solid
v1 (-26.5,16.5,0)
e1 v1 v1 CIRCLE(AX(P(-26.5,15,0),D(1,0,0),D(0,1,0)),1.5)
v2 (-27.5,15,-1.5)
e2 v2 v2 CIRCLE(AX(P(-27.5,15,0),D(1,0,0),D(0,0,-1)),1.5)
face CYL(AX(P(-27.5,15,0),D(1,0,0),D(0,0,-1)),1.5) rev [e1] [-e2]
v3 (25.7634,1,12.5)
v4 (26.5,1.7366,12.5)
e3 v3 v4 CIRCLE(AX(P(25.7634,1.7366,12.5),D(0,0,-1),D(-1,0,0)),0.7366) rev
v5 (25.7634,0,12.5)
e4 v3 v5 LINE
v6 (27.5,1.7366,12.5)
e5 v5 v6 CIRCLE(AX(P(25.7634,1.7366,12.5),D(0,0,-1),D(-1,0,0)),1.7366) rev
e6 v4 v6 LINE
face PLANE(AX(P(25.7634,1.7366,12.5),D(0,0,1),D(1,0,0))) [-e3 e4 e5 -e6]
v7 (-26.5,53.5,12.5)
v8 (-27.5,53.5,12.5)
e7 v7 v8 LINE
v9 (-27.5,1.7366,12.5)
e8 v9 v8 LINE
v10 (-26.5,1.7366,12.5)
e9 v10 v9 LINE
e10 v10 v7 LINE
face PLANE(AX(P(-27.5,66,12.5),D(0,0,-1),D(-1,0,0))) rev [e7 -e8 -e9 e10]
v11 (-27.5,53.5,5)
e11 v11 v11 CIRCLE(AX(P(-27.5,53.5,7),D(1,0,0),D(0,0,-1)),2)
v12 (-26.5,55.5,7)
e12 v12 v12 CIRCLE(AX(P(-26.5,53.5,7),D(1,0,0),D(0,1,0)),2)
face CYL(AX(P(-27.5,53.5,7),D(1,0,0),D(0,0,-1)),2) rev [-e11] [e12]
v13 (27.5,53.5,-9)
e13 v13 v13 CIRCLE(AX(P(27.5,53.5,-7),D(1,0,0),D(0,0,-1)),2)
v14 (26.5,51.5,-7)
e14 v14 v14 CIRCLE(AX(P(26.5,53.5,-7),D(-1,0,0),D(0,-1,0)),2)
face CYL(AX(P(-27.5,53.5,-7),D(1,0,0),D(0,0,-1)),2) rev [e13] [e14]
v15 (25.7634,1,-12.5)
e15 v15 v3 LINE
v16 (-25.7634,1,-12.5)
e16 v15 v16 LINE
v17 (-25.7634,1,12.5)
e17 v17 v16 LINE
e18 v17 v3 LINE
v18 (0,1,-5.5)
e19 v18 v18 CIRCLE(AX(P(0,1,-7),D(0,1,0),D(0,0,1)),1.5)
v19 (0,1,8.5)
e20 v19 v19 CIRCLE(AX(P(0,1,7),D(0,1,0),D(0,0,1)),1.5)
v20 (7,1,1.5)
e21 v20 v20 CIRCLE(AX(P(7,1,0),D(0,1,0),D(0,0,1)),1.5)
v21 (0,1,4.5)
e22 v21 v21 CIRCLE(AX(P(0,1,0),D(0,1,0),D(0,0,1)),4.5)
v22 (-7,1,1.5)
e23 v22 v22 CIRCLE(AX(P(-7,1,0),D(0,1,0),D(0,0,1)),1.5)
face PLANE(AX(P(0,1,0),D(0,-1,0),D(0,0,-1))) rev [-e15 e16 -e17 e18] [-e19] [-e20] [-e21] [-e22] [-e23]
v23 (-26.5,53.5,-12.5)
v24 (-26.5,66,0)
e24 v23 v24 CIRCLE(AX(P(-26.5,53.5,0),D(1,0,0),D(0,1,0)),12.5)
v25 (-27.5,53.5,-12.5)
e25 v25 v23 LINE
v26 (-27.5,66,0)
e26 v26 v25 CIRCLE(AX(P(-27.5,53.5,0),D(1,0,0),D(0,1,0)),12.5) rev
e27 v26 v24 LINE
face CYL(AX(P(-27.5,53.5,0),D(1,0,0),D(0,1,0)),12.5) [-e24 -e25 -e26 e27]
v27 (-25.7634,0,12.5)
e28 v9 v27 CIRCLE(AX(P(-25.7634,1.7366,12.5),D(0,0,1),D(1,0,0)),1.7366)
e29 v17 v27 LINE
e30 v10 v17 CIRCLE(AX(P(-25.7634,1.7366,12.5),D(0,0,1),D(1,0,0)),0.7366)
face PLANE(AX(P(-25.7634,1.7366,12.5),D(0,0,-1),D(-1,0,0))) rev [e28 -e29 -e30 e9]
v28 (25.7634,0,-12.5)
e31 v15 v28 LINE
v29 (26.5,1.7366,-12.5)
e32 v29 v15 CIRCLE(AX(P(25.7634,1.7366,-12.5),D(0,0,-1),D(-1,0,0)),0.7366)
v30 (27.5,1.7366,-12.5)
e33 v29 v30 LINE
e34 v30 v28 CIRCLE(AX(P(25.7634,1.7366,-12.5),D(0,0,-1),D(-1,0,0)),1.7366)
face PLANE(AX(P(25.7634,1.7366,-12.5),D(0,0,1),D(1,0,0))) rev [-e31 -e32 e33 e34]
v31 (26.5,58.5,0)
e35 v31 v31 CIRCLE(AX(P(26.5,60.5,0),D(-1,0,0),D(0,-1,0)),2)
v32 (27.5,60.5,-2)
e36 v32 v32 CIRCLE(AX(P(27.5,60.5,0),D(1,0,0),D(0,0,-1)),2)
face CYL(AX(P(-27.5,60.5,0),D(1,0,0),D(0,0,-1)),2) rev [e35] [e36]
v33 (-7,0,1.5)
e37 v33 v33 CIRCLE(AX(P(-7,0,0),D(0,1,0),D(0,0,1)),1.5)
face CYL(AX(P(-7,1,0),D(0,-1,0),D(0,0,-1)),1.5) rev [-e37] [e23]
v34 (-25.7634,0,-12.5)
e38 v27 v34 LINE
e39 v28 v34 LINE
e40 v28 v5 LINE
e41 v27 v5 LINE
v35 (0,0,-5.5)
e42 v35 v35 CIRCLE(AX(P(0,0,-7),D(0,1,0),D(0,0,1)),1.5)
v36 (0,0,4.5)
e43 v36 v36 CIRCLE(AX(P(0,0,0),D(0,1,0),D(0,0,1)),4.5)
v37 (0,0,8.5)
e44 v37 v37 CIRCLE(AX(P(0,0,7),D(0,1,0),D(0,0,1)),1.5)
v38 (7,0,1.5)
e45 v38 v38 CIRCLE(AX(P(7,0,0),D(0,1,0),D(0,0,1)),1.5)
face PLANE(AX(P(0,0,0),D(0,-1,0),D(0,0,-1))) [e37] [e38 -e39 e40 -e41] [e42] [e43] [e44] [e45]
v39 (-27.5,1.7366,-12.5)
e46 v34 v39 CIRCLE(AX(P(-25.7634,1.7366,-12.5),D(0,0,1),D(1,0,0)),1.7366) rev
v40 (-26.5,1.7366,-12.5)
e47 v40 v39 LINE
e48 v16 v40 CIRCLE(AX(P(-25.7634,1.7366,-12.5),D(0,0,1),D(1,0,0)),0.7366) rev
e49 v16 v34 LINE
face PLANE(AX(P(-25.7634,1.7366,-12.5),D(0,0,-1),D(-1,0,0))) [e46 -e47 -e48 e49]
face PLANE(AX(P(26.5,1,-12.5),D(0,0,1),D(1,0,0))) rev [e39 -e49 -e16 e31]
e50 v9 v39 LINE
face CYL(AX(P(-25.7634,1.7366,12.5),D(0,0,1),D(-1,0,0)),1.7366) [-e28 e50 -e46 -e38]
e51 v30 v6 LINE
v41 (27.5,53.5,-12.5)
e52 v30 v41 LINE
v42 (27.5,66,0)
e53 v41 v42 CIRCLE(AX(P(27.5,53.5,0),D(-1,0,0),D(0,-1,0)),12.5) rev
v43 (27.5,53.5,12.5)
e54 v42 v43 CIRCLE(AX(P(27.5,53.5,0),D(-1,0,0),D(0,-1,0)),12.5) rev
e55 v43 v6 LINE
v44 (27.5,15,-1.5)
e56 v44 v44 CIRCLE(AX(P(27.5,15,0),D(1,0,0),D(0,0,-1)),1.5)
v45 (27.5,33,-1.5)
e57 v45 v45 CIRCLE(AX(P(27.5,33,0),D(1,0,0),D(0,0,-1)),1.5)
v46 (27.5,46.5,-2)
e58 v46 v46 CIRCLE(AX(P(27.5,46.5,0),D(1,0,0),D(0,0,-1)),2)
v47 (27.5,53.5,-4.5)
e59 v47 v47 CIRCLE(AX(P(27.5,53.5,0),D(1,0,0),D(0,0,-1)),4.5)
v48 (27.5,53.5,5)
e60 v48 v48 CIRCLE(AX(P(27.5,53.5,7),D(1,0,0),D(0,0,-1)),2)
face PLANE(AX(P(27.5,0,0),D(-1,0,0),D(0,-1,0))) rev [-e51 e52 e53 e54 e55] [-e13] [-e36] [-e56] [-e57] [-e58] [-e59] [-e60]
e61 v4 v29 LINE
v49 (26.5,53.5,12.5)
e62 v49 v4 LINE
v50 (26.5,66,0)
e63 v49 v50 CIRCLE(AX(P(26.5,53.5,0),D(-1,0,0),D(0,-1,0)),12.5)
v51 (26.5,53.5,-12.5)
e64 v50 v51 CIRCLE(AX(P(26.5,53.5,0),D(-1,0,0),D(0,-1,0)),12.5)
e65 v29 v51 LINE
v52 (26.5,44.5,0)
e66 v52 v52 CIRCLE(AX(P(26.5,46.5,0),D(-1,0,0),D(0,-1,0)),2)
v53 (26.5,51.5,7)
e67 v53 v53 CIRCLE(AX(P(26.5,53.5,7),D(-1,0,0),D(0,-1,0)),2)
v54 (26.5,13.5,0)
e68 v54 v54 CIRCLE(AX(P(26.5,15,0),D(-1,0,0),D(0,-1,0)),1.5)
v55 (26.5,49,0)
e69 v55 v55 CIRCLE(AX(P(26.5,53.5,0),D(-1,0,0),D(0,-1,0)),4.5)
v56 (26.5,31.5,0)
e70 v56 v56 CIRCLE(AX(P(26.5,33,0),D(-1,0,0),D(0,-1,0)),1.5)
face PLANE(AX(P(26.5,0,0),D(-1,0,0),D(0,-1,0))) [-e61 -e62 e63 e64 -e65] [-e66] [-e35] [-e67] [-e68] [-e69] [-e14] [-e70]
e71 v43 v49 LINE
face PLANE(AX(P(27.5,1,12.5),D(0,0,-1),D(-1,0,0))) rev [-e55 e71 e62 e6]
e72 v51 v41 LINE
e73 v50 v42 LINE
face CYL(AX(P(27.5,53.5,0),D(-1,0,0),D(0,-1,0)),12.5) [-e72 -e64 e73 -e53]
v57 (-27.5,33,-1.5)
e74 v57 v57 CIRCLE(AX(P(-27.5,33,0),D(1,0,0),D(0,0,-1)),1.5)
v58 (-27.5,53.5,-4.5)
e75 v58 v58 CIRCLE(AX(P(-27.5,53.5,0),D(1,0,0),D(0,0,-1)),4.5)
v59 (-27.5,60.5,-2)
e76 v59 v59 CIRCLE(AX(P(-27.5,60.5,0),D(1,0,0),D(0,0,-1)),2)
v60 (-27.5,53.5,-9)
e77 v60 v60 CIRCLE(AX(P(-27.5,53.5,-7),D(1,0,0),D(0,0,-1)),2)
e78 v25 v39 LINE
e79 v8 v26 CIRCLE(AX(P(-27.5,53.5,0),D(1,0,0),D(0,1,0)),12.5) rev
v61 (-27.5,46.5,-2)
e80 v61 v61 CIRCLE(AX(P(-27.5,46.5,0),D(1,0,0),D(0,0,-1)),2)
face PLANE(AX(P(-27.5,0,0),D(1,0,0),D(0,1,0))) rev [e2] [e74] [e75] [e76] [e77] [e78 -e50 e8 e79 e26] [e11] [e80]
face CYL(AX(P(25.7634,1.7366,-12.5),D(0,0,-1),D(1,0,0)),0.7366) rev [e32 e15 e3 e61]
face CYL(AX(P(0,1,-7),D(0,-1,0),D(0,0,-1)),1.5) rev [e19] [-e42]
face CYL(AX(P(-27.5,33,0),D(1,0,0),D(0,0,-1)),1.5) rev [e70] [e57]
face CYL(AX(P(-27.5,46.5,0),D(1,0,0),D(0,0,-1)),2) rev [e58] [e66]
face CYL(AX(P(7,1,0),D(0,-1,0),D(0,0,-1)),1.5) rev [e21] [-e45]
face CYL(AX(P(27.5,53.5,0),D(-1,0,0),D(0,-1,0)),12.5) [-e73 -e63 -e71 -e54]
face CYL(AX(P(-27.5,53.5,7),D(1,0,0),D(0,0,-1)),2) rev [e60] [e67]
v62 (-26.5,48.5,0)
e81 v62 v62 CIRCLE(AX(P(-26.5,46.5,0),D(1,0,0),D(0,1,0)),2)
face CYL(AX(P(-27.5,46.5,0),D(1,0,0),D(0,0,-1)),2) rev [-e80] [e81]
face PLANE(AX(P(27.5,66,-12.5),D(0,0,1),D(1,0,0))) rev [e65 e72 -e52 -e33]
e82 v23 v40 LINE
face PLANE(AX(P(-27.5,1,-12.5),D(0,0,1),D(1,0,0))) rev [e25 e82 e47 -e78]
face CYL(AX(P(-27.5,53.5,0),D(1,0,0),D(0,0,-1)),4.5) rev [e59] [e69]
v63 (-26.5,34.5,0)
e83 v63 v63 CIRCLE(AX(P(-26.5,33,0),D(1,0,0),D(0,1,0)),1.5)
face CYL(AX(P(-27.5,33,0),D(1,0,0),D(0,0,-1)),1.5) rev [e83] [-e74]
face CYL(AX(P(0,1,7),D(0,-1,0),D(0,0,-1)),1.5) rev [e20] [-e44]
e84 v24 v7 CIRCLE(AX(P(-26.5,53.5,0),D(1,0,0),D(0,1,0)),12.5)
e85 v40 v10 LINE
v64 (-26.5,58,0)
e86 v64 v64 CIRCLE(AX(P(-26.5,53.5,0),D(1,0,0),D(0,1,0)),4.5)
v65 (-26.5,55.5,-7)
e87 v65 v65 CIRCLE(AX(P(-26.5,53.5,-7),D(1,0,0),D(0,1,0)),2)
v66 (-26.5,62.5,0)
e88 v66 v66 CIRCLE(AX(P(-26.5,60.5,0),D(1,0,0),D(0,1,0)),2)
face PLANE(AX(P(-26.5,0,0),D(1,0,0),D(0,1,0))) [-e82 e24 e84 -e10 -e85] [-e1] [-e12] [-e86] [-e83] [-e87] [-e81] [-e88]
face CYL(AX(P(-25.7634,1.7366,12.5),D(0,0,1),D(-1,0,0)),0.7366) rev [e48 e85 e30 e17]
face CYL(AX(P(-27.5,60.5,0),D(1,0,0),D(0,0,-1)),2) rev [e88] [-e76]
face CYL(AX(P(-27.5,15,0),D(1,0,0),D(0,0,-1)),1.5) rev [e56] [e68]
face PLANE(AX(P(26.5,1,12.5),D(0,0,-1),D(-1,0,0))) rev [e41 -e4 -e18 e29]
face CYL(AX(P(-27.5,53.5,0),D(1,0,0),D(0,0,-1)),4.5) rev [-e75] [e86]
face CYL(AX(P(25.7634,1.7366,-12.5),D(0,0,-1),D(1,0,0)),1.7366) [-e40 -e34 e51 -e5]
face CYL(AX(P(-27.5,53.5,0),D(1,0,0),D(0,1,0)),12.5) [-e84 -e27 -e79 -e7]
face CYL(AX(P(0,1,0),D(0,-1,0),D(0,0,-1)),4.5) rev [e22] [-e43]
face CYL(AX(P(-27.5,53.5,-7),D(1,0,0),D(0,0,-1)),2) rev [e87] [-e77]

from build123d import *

# Parameters (mm, degrees)
SKETCH1_W                      = 53
SKETCH1_H                      = 25
SKETCH1_R                      = 4.5
SKETCH1_R_2                    = 1.5
BASE_FLANGE1_DEPTH             = 1
EDGE_FLANGE1_STRIP_W           = 5.4732
EDGE_FLANGE1_STRIP_H           = 1
EDGE_FLANGE1_STRIP_CUT_DEPTH   = 25
EDGE_FLANGE1_STRIP_2_W         = 5.4732
EDGE_FLANGE1_STRIP_2_H         = 1
EDGE_FLANGE1_STRIP_CUT_2_DEPTH = 25
EDGE_FLANGE1_DEPTH             = 25
EDGE_FLANGE1_BEND_DEPTH        = 25
CUT_EXTRUDE1_DEPTH             = 73.584433593
CUT_EXTRUDE1_DEPTH_BACK        = 73.584433593
SKETCH13_R                     = 4.5
SKETCH13_R_2                   = 2
SKETCH13_R_3                   = 1.5
FILLET1_R                      = 12.5


# Sheet-metal steps are written as plain solids
with BuildPart() as part:
    # Sketch1 → Base-Flange1 (new body)
    with BuildSketch(Plane(origin=(0, 0, 0), x_dir=(1, 0, 0), z_dir=(0, 1, 0))):
        Rectangle(SKETCH1_W, SKETCH1_H)
        with Locations(Location((0, 0, 0), (0, 0, 270))):
            Circle(SKETCH1_R, mode=Mode.SUBTRACT)
        with Locations(Location((-7, 0, 0), (0, 0, 270))):
            Circle(SKETCH1_R_2, mode=Mode.SUBTRACT)
        with Locations(Location((7, 0, 0), (0, 0, 270))):
            Circle(SKETCH1_R_2, mode=Mode.SUBTRACT)
        with Locations(Location((0, 7, 0), (0, 0, 270))):
            Circle(SKETCH1_R_2, mode=Mode.SUBTRACT)
        with Locations(Location((0, -7, 0), (0, 0, 270))):
            Circle(SKETCH1_R_2, mode=Mode.SUBTRACT)
    extrude(amount=BASE_FLANGE1_DEPTH)

    # Edge-Flange1 strip (across the edge) → Edge-Flange1 strip cut (cut)
    with BuildSketch(Plane(origin=(-26.5, 1, -12.5), x_dir=(1, 0, 0), z_dir=(0, 0, 1))):
        with Locations((-2, -0.5)):
            Rectangle(EDGE_FLANGE1_STRIP_W, EDGE_FLANGE1_STRIP_H)
    extrude(amount=EDGE_FLANGE1_STRIP_CUT_DEPTH, mode=Mode.SUBTRACT)

    # Edge-Flange1 strip 2 (across the edge) → Edge-Flange1 strip cut 2 (cut)
    with BuildSketch(Plane(origin=(26.5, 1, 12.5), x_dir=(-1, 0, 0), z_dir=(0, 0, -1))):
        with Locations((-2, -0.5)):
            Rectangle(EDGE_FLANGE1_STRIP_2_W, EDGE_FLANGE1_STRIP_2_H)
    extrude(amount=EDGE_FLANGE1_STRIP_CUT_2_DEPTH, mode=Mode.SUBTRACT)

    # Edge-Flange1 section (across the edge) → Edge-Flange1 (add)
    with BuildSketch(Plane(origin=(-26.5, 1, -12.5), x_dir=(1, 0, 0), z_dir=(0, 0, 1))):
        with BuildLine():
            Line((-1, 0.7366), (-1, 65))
            Line((-1, 65), (0, 65))
            Line((0, 65), (0, 0.7366))
            ThreePointArc((0, 0.7366), (0.215745145, 0.215745145), (0.7366, 0))
            Line((0.7366, 0), (0.7366, -1))
            ThreePointArc((0.7366, -1), (-0.491361636, -0.491361636), (-1, 0.7366))
        make_face()
    extrude(amount=EDGE_FLANGE1_DEPTH)

    # Edge-Flange1 section 2 (across the edge) → Edge-Flange1 bend (add)
    with BuildSketch(Plane(origin=(26.5, 1, 12.5), x_dir=(-1, 0, 0), z_dir=(0, 0, -1))):
        with BuildLine():
            Line((-1, 0.7366), (-1, 65))
            Line((-1, 65), (0, 65))
            Line((0, 65), (0, 0.7366))
            ThreePointArc((0, 0.7366), (0.215745145, 0.215745145), (0.7366, 0))
            Line((0.7366, 0), (0.7366, -1))
            ThreePointArc((0.7366, -1), (-0.491361636, -0.491361636), (-1, 0.7366))
        make_face()
    extrude(amount=EDGE_FLANGE1_BEND_DEPTH)

    # Sketch13 → Cut-Extrude1 (cut, two sides: drawn at the far end of the back side and taken through both)
    with BuildSketch(Plane(origin=(0, 0, 0), x_dir=(0, 0, -1), z_dir=(1, 0, 0)).offset(-CUT_EXTRUDE1_DEPTH_BACK)):
        with Locations((0, 53.5)):
            Circle(SKETCH13_R)
        with Locations((-7, 53.5)):
            Circle(SKETCH13_R_2)
        with Locations((7, 53.5)):
            Circle(SKETCH13_R_2)
        with Locations((0, 46.5)):
            Circle(SKETCH13_R_2)
        with Locations((0, 60.5)):
            Circle(SKETCH13_R_2)
        with Locations((0, 33)):
            Circle(SKETCH13_R_3)
        with Locations((0, 15)):
            Circle(SKETCH13_R_3)
    extrude(amount=CUT_EXTRUDE1_DEPTH + CUT_EXTRUDE1_DEPTH_BACK, mode=Mode.SUBTRACT)

    # Fillet1
    fillet1_edges = [part.edges().sort_by_distance(p)[0] for p in [
        (-27, 66, -12.5),
        (-27, 66, 12.5),
        (27, 66, -12.5),
        (27, 66, 12.5),
    ]]
    fillet(fillet1_edges, radius=FILLET1_R - 0.0001)  # a hair under: the kernel refuses the full size


solid = part.part
